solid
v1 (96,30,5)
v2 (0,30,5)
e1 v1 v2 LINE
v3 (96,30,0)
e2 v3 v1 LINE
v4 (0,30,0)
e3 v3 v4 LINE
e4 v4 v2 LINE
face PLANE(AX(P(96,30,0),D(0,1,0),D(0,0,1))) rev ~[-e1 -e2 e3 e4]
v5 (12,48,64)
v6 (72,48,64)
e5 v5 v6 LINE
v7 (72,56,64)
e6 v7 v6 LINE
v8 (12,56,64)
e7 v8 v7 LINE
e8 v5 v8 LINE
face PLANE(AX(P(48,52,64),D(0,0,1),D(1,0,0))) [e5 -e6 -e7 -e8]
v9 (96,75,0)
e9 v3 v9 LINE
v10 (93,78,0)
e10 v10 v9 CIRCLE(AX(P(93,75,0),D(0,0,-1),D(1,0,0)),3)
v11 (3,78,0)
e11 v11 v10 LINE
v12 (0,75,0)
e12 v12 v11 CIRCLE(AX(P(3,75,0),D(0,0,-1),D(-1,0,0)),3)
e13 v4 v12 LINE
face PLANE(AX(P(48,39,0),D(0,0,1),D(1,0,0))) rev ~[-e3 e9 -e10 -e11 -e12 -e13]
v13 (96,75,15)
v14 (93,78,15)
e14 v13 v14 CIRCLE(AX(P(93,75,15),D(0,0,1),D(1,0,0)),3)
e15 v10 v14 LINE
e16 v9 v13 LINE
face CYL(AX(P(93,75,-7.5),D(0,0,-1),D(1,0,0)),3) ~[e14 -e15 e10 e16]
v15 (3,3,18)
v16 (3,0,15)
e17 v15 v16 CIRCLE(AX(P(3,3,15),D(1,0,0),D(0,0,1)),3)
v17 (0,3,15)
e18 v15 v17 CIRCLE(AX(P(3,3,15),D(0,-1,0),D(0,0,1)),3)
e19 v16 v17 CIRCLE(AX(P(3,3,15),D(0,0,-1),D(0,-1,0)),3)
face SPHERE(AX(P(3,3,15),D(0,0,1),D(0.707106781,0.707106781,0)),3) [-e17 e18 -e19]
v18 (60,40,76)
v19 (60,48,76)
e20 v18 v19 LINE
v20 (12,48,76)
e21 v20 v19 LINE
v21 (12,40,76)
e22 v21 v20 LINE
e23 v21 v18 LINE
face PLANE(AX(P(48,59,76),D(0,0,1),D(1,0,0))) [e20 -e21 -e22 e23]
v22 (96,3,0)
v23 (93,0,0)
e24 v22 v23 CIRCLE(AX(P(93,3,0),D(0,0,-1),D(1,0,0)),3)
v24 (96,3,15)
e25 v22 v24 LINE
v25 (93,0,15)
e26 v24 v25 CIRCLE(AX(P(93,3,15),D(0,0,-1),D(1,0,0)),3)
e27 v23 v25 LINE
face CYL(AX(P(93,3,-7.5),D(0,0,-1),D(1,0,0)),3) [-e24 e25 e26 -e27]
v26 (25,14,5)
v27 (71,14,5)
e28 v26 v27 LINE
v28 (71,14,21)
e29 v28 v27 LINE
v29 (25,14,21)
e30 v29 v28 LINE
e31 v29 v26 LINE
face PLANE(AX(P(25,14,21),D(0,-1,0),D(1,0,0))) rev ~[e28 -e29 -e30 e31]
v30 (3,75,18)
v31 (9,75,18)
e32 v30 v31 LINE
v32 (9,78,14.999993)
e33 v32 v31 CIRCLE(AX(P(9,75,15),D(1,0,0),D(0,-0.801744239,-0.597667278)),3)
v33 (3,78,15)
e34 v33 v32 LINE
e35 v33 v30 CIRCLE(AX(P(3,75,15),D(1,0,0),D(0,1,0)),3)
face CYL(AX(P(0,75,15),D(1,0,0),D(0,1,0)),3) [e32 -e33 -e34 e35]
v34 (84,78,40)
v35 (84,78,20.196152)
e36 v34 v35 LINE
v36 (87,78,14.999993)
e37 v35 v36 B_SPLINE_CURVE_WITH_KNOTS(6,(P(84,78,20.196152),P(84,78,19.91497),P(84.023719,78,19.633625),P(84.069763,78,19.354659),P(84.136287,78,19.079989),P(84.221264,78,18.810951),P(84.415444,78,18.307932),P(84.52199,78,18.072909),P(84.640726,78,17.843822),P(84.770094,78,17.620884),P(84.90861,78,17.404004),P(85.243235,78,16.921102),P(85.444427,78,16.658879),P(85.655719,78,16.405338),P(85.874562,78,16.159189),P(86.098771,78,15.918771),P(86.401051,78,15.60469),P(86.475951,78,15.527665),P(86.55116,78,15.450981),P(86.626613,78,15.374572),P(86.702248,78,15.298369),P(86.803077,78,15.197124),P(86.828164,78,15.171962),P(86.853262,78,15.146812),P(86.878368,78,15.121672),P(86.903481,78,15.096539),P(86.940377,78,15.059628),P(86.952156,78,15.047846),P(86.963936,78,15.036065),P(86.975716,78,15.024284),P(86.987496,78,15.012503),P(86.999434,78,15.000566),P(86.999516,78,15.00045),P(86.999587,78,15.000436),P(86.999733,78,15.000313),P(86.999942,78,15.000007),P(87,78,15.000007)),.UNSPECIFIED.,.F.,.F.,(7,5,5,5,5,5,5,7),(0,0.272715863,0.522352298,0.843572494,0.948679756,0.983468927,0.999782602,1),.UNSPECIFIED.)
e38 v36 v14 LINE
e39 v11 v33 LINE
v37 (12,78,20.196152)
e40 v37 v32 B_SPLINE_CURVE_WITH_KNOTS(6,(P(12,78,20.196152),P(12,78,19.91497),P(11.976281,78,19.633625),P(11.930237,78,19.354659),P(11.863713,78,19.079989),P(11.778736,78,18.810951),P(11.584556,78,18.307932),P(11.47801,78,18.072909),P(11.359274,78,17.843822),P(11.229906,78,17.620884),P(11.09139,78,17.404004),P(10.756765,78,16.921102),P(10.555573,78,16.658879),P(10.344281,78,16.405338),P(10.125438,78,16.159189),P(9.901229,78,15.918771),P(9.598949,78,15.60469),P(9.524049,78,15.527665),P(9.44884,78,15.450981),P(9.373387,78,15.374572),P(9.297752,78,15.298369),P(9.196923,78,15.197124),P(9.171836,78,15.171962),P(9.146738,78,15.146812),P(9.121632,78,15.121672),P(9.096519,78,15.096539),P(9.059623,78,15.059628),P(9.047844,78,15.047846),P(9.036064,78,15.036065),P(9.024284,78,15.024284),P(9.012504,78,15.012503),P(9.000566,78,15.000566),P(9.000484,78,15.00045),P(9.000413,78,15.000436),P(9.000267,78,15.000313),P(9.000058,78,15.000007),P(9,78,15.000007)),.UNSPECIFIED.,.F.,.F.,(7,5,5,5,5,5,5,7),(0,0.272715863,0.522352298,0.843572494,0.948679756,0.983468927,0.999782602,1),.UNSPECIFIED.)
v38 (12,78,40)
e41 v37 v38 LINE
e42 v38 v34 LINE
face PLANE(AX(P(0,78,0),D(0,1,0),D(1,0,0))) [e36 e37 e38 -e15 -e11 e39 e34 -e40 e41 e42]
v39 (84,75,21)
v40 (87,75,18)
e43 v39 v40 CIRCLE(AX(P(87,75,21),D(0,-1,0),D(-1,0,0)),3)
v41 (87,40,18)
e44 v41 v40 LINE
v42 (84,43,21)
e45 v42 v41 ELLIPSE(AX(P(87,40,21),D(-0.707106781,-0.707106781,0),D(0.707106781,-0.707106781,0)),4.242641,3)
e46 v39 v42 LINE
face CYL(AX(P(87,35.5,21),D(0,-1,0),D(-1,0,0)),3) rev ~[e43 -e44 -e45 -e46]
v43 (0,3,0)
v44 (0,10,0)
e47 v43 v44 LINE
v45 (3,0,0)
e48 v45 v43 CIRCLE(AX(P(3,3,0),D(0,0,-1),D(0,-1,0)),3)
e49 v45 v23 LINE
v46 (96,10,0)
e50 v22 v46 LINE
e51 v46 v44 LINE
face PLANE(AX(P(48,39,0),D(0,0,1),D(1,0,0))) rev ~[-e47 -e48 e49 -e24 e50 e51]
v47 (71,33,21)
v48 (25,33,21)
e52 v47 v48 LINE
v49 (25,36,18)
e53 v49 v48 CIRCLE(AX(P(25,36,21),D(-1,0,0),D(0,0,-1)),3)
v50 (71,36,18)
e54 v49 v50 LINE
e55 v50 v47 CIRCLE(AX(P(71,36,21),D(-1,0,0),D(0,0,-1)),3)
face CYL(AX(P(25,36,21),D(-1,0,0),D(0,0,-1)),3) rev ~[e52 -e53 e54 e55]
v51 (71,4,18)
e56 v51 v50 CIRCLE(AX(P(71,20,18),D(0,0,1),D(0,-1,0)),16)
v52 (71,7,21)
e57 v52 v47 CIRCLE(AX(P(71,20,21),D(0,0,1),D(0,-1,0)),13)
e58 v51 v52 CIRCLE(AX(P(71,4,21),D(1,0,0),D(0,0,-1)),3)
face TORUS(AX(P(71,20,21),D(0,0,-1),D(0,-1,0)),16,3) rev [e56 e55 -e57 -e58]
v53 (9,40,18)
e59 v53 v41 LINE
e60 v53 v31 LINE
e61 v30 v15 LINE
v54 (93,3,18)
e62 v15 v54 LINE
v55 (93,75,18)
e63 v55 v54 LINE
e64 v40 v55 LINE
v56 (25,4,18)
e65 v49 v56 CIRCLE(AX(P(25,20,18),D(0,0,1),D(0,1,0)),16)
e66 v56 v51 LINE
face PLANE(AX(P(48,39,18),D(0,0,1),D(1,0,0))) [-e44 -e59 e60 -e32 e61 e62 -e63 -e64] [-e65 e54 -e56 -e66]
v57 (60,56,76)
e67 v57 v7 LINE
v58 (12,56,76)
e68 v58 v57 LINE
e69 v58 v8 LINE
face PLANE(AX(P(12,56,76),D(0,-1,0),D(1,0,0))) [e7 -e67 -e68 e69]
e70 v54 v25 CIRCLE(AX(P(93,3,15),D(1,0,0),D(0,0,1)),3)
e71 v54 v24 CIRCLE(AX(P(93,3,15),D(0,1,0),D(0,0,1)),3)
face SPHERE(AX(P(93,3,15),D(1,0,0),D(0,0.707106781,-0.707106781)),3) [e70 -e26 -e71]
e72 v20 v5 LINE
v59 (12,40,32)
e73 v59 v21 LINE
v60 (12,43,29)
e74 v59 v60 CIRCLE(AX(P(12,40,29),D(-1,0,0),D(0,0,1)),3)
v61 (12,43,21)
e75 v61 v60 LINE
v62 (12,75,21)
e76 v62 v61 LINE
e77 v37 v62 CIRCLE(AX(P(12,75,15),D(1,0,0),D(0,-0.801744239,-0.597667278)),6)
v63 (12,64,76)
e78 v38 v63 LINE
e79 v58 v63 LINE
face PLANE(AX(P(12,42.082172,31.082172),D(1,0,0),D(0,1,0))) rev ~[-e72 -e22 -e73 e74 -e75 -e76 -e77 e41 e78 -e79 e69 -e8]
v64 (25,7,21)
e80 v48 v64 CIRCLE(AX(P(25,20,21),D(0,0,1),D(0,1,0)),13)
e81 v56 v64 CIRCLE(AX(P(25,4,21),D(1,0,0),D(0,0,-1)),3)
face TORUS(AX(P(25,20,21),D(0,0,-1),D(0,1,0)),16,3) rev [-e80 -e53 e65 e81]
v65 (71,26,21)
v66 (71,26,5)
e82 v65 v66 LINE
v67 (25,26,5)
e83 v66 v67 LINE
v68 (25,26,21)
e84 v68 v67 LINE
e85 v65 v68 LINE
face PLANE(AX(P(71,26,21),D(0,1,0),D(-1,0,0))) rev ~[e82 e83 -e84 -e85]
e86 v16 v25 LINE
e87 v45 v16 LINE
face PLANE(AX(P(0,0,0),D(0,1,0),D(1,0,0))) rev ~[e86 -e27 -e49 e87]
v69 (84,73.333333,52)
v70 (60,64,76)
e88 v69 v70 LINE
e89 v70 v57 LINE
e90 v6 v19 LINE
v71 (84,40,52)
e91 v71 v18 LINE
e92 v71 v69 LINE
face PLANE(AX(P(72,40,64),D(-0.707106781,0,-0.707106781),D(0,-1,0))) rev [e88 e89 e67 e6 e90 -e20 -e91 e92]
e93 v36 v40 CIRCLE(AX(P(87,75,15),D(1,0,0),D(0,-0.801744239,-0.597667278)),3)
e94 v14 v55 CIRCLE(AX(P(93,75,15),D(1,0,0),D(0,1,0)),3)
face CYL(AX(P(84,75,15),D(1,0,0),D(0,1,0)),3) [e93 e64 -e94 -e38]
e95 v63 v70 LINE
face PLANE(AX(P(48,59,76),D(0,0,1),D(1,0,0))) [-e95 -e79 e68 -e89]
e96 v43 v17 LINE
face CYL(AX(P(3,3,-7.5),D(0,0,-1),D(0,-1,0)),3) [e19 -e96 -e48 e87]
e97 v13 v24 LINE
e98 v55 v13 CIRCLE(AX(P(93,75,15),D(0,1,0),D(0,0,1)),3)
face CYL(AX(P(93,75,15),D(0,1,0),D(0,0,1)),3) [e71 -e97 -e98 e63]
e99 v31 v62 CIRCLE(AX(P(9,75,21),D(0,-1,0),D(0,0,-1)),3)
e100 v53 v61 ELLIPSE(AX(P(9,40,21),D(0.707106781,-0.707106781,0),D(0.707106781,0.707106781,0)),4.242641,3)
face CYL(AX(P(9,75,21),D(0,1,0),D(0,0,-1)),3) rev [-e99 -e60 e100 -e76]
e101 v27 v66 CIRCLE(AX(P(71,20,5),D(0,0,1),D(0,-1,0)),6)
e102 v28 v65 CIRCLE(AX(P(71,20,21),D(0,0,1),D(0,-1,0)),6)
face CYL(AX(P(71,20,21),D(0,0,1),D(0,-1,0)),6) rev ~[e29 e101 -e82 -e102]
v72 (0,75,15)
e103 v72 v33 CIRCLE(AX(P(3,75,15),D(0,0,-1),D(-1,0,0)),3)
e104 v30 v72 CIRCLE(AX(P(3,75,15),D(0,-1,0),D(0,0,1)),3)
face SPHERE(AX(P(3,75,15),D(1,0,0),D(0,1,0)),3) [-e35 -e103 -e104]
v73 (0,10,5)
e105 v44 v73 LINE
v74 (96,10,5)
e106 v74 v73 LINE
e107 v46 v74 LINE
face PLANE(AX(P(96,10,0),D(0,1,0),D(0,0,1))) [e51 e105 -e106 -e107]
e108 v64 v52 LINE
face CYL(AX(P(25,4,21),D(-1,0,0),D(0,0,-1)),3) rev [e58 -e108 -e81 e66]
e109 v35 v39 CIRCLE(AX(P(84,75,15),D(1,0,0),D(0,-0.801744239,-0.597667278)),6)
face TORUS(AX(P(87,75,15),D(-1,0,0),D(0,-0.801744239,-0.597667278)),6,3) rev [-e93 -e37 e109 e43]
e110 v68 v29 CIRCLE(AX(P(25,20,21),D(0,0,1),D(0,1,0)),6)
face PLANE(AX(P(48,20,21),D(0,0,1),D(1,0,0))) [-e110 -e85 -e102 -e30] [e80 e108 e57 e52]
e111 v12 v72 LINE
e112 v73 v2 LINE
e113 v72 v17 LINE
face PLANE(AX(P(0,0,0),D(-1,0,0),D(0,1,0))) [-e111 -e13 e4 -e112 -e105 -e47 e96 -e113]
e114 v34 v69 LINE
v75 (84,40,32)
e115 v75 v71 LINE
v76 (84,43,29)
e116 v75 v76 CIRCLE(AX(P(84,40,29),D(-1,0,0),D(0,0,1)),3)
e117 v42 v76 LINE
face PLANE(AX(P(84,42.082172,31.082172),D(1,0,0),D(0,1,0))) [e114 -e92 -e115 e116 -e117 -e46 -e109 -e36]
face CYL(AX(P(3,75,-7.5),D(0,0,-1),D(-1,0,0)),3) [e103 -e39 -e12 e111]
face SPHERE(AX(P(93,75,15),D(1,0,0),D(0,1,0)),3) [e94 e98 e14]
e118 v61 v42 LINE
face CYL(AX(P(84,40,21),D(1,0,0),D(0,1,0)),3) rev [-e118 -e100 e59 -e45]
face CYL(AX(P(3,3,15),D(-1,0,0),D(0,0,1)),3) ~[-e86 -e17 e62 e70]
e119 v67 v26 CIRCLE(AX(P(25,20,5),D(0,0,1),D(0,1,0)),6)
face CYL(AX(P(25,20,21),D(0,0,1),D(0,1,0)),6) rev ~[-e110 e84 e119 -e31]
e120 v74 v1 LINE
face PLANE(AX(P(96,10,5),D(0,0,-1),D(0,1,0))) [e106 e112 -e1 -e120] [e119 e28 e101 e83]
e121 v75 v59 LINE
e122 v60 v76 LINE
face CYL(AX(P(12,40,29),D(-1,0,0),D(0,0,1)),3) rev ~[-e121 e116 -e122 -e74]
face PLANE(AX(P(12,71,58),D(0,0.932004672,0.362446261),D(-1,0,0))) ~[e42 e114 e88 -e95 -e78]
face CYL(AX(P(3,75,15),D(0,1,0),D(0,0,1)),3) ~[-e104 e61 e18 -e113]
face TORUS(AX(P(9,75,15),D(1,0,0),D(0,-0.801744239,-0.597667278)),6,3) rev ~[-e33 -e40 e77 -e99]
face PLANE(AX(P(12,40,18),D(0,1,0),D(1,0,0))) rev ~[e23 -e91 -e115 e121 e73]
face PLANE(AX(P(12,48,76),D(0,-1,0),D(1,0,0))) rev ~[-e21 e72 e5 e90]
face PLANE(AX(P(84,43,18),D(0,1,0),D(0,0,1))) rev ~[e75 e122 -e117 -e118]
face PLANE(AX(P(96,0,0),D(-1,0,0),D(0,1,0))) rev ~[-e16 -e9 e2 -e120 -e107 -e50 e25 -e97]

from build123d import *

# Parameters (mm, degrees)
F0_W          = 96
F0_H          = 78
F1_DEPTH      = 18
F2_W          = 72
F2_H          = 38
F3_DEPTH      = 58
F4_R          = 3
F5_W          = 72
F5_H          = 8
F6_DEPTH      = 12
F7_C1_SIZE    = 24
F8_SIZE2      = 14
F8_SIZE       = 36
F9_W          = 3
F9_H          = 14
F10_DEPTH     = 72
F11_W         = 20
F11_H         = 5
F12_DEPTH     = 96
F14_DEPTH     = 3
F16_DEPTH     = 16
F17_T1_DEPTH  = 72
F17_T3_DEPTH  = 32
F17_T5_DEPTH  = 46
F17_T8_ANGLE  = 180
F17_T10_ANGLE = 180
F17_T14_ANGLE = 233.2969892374
F17_T19_ANGLE = 233.2969892374
F17_T25_DEPTH = 39.5
F17_T29_DEPTH = 79.5
F17_T36_DEPTH = 79.5
F17_T40_DEPTH = 39.5
F17_T43_DEPTH = 22.5
F17_T45_DEPTH = 90
F17_T47_DEPTH = 72
F17_S51_W     = 3.06
F17_S51_H     = 3.06
F17_T52_DEPTH = 3.06
F17_S57_W     = 3.06
F17_S57_H     = 3.06
F17_T58_DEPTH = 3.06
F17_T62_ANGLE = 90
F17_T64_ANGLE = 90


# Not quite as in the source:
# - a fillet or chamfer that OpenCascade refuses, or shapes differently, is made with other operations: its cross-section is extruded or revolved along the edge and cut away or added


with BuildPart() as f1:
    # F0 (on Top) → F1 (new body)
    with BuildSketch(Plane.XY):
        with Locations((48, 39)):
            Rectangle(F0_W, F0_H)
    extrude(amount=F1_DEPTH)

    # F2 (on face) → F3 (join)
    with BuildSketch(Plane.XY.offset(18)):
        with Locations((48, 59)):
            Rectangle(F2_W, F2_H)
    extrude(amount=F3_DEPTH)

    # F4
    f4_edges = [f1.edges().sort_by_distance(p)[0] for p in [
        (90, 78, 18),
        (6, 78, 18),
    ]]
    fillet(f4_edges, radius=F4_R)

    # F5 (on face) → F6 (cut)
    with BuildSketch(Plane.XY.offset(76)):
        with Locations((48, 52)):
            Rectangle(F5_W, F5_H)
    extrude(amount=-F6_DEPTH, mode=Mode.SUBTRACT)

    # F7: chamfer of 24 on 2 edges, made by hand

    # F7_c1
    f7_c1_edges = [f1.edges().sort_by_distance(p)[0] for p in [
        (84, 44, 76),
    ]]
    chamfer(f7_c1_edges, length=F7_C1_SIZE)

    # F8
    f8_edges = [f1.edges().sort_by_distance(p)[0] for p in [
        (36, 78, 76),
    ]]
    f8_side = f1.faces().sort_by_distance((46.545455, 78, 34.461039))[0]
    chamfer(f8_edges, length=F8_SIZE, length2=F8_SIZE2, reference=f8_side)

    # F9 (on face) → F10 (cut, through all)
    with BuildSketch(Plane.YZ.offset(84)):
        with Locations((41.5, 25)):
            Rectangle(F9_W, F9_H)
    extrude(amount=-F10_DEPTH, mode=Mode.SUBTRACT)

    # F11 (on face) → F12 (cut, through all)
    with BuildSketch(Plane.YZ.offset(96)):
        with Locations((20, 2.5)):
            Rectangle(F11_W, F11_H)
    extrude(amount=-F12_DEPTH, mode=Mode.SUBTRACT)

    # F13 (on face) → F14 (join)
    with BuildSketch(Plane.XY.offset(18)):
        with BuildLine():
            ThreePointArc((71, 7), (84, 20), (71, 33))
            Line((71, 33), (25, 33))
            ThreePointArc((25, 33), (12, 20), (25, 7))
            Line((25, 7), (71, 7))
        make_face()
    extrude(amount=F14_DEPTH)

    # F15 (on face) → F16 (cut, through all)
    with BuildSketch(Plane.XY.offset(21)):
        with BuildLine():
            ThreePointArc((25, 26), (19, 20), (25, 14))
            Line((25, 14), (71, 14))
            ThreePointArc((71, 14), (77, 20), (71, 26))
            Line((71, 26), (25, 26))
        make_face()
    extrude(amount=-F16_DEPTH, mode=Mode.SUBTRACT)

    # F17: fillet of radius 3 on 17 edges, made by hand

    # F17_s2 → F17_t1 (join)
    with BuildSketch(Plane.YZ.offset(12)):
        with BuildLine():
            ThreePointArc((40, 32), (42.1213203436, 31.1213203436), (43, 29))
            Line((43, 29), (43, 32))
            Line((43, 32), (40, 32))
        make_face()
        with BuildLine():
            ThreePointArc((43, 21), (42.1213203436, 18.8786796564), (40, 18))
            Line((40, 18), (43, 18))
            Line((43, 18), (43, 21))
        make_face()
    extrude(amount=F17_T1_DEPTH)

    # F17_s4 → F17_t3 (join)
    with BuildSketch(Plane.XZ.offset(-75)):
        with BuildLine():
            ThreePointArc((84, 21), (84.8786796564, 18.8786796564), (87, 18))
            Line((87, 18), (84, 18))
            Line((84, 18), (84, 21))
        make_face()
        with BuildLine():
            ThreePointArc((9, 18), (11.1213203436, 18.8786796564), (12, 21))
            Line((12, 21), (12, 18))
            Line((12, 18), (9, 18))
        make_face()
    extrude(amount=F17_T3_DEPTH)

    # F17_s6 → F17_t5 (join)
    with BuildSketch(Plane.YZ.offset(25)):
        with BuildLine():
            ThreePointArc((4, 18), (6.1213203436, 18.8786796564), (7, 21))
            Line((7, 21), (7, 18))
            Line((7, 18), (4, 18))
        make_face()
        with BuildLine():
            ThreePointArc((36, 18), (33.8786796564, 18.8786796564), (33, 21))
            Line((33, 21), (33, 18))
            Line((33, 18), (36, 18))
        make_face()
    extrude(amount=F17_T5_DEPTH)

    # F17_s7 → F17_t8 (revolve)
    with BuildSketch(Plane.YZ.offset(25)):
        with BuildLine():
            ThreePointArc((36, 18), (33.8786796564, 18.8786796564), (33, 21))
            Line((33, 21), (33, 18))
            Line((33, 18), (36, 18))
        make_face()
    revolve(axis=Axis((25, 20, 18), (0, 0, 1)), revolution_arc=F17_T8_ANGLE)

    # F17_s9 → F17_t10 (revolve)
    with BuildSketch(Plane.YZ.offset(71)):
        with BuildLine():
            ThreePointArc((4, 18), (6.1213203436, 18.8786796564), (7, 21))
            Line((7, 21), (7, 18))
            Line((7, 18), (4, 18))
        make_face()
    revolve(axis=Axis((71, 20, 18), (0, 0, 1)), revolution_arc=F17_T10_ANGLE)


with BuildPart() as f17_tool12:
    # F17_s13 → F17_t14 (revolve)
    with BuildSketch(Plane(origin=(0, 19.6028186536, -26.2963148857), x_dir=(1, 0, 0), z_dir=(0, -0.5976672776, 0.8017442393))):
        with BuildLine():
            ThreePointArc((12, 63.0958271118), (11.1213203436, 65.2171474554), (9, 66.0958271118))
            Line((9, 66.0958271118), (12, 66.0958271118))
            Line((12, 66.0958271118), (12, 63.0958271118))
        make_face()
    revolve(axis=Axis((12, 75, 15), (1, 0, 0)), revolution_arc=F17_T14_ANGLE)

    split(bisect_by=Plane.XZ.offset(-78), keep=Keep.TOP)


with BuildPart() as f1_1:
    add(f1.part)

    # F17_t11: union F17_tool12
    add(f17_tool12.part)


with BuildPart() as f17_tool17:
    # F17_s18 → F17_t19 (revolve)
    with BuildSketch(Plane(origin=(0, 19.6028186536, -26.2963148857), x_dir=(1, 0, 0), z_dir=(0, -0.5976672776, 0.8017442393))):
        with BuildLine():
            ThreePointArc((84, 63.0958271118), (84.8786796564, 65.2171474554), (87, 66.0958271118))
            Line((87, 66.0958271118), (84, 66.0958271118))
            Line((84, 66.0958271118), (84, 63.0958271118))
        make_face()
    revolve(axis=Axis((84, 75, 15), (1, 0, 0)), revolution_arc=F17_T19_ANGLE)

    split(bisect_by=Plane.XZ.offset(-78), keep=Keep.TOP)


with BuildPart() as f1_2:
    add(f1_1.part)

    # F17_t16: union F17_tool17
    add(f17_tool17.part)


with BuildPart() as f17_tool23:
    # F17_s24 → F17_t25 (new body)
    with BuildSketch(Plane.XZ.offset(-35.5)):
        with BuildLine():
            ThreePointArc((84, 21), (84.8786796564, 18.8786796564), (87, 18))
            Line((87, 18), (84, 18))
            Line((84, 18), (84, 21))
        make_face()
    extrude(amount=-F17_T25_DEPTH)

    split(bisect_by=Plane.XZ.offset(-43), keep=Keep.TOP)


with BuildPart() as f17_tool27:
    # F17_s28 → F17_t29 (new body)
    with BuildSketch(Plane.YZ.offset(91.5)):
        with BuildLine():
            ThreePointArc((43, 21), (42.1213203436, 18.8786796564), (40, 18))
            Line((40, 18), (43, 18))
            Line((43, 18), (43, 21))
        make_face()
    extrude(amount=-F17_T29_DEPTH)

    split(bisect_by=Plane.YZ.offset(84), keep=Keep.TOP)


with BuildPart() as f17_tool23_1:
    add(f17_tool23.part)

    # F17_t31: intersect F17_tool27
    add(f17_tool27.part, mode=Mode.INTERSECT)


with BuildPart() as f1_3:
    add(f1_2.part)

    # F17_t21: union F17_tool23
    add(f17_tool23_1.part)


with BuildPart() as f17_tool34:
    # F17_s35 → F17_t36 (new body)
    with BuildSketch(Plane.YZ.offset(84)):
        with BuildLine():
            ThreePointArc((43, 21), (42.1213203436, 18.8786796564), (40, 18))
            Line((40, 18), (43, 18))
            Line((43, 18), (43, 21))
        make_face()
    extrude(amount=-F17_T36_DEPTH)

    split(bisect_by=Plane.YZ.offset(12), keep=Keep.BOTTOM)


with BuildPart() as f17_tool38:
    # F17_s39 → F17_t40 (new body)
    with BuildSketch(Plane.XZ.offset(-75)):
        with BuildLine():
            ThreePointArc((9, 18), (11.1213203436, 18.8786796564), (12, 21))
            Line((12, 21), (12, 18))
            Line((12, 18), (9, 18))
        make_face()
    extrude(amount=F17_T40_DEPTH)

    split(bisect_by=Plane.XZ.offset(-43), keep=Keep.TOP)


with BuildPart() as f17_tool34_1:
    add(f17_tool34.part)

    # F17_t42: intersect F17_tool38
    add(f17_tool38.part, mode=Mode.INTERSECT)


with BuildPart() as f1_4:
    add(f1_3.part)

    # F17_t32: union F17_tool34
    add(f17_tool34_1.part)

    # F17_s44 → F17_t43 (cut)
    with BuildSketch(Plane.XY.offset(-7.5)):
        with BuildLine():
            ThreePointArc((3, 0), (0.8786796564, 0.8786796564), (0, 3))
            Line((0, 3), (0, 0))
            Line((0, 0), (3, 0))
        make_face()
        with BuildLine():
            ThreePointArc((96, 3), (95.1213203436, 0.8786796564), (93, 0))
            Line((93, 0), (96, 0))
            Line((96, 0), (96, 3))
        make_face()
        with BuildLine():
            ThreePointArc((0, 75), (0.8786796564, 77.1213203436), (3, 78))
            Line((3, 78), (0, 78))
            Line((0, 78), (0, 75))
        make_face()
        with BuildLine():
            ThreePointArc((96, 75), (95.1213203436, 77.1213203436), (93, 78))
            Line((93, 78), (96, 78))
            Line((96, 78), (96, 75))
        make_face()
    extrude(amount=F17_T43_DEPTH, mode=Mode.SUBTRACT)

    # F17_s46 → F17_t45 (cut)
    with BuildSketch(Plane.YZ.offset(3)):
        with BuildLine():
            ThreePointArc((3, 18), (0.8786796564, 17.1213203436), (0, 15))
            Line((0, 15), (0, 18))
            Line((0, 18), (3, 18))
        make_face()
    extrude(amount=F17_T45_DEPTH, mode=Mode.SUBTRACT)

    # F17_s48 → F17_t47 (cut)
    with BuildSketch(Plane.XZ.offset(-75)):
        with BuildLine():
            ThreePointArc((3, 18), (0.8786796564, 17.1213203436), (0, 15))
            Line((0, 15), (0, 18))
            Line((0, 18), (3, 18))
        make_face()
        with BuildLine():
            ThreePointArc((93, 18), (95.1213203436, 17.1213203436), (96, 15))
            Line((96, 15), (96, 18))
            Line((96, 18), (93, 18))
        make_face()
    extrude(amount=F17_T47_DEPTH, mode=Mode.SUBTRACT)


with BuildPart() as f17_tool50:
    # F17_s51 → F17_t52 (new body)
    with BuildSketch(Plane.XY.offset(15)):
        with Locations((1.47, 1.47)):
            Rectangle(F17_S51_W, F17_S51_H)
    extrude(amount=F17_T52_DEPTH)

    # F17_s53 → F17_t54 (revolve, cut)
    with BuildSketch(Plane(origin=(3, 3, 15), x_dir=(0.7071067812, 0.7071067812, 0), z_dir=(0.7071067812, -0.7071067812, 0))):
        with BuildLine():
            ThreePointArc((0, -3), (3, 0), (0, 3))
            Line((0, 3), (0, -3))
        make_face()
    revolve(axis=Axis((3, 3, 15), (0, 0, 1)), mode=Mode.SUBTRACT)


with BuildPart() as f1_5:
    add(f1_4.part)

    # F17_t49: cut F17_tool50
    add(f17_tool50.part, mode=Mode.SUBTRACT)


with BuildPart() as f17_tool56:
    # F17_s57 → F17_t58 (new body)
    with BuildSketch(Plane.YZ.offset(93)):
        with Locations((1.47, 16.53)):
            Rectangle(F17_S57_W, F17_S57_H)
    extrude(amount=F17_T58_DEPTH)

    # F17_s59 → F17_t60 (revolve, cut)
    with BuildSketch(Plane(origin=(93, 3, 15), x_dir=(0, 0.7071067812, -0.7071067812), z_dir=(0, -0.7071067812, -0.7071067812))):
        with BuildLine():
            ThreePointArc((0, -3), (3, 0), (0, 3))
            Line((0, 3), (0, -3))
        make_face()
    revolve(axis=Axis((93, 3, 15), (1, 0, 0)), mode=Mode.SUBTRACT)


with BuildPart() as f1_6:
    add(f1_5.part)

    # F17_t55: cut F17_tool56
    add(f17_tool56.part, mode=Mode.SUBTRACT)

    # F17_s61 → F17_t62 (revolve, cut)
    with BuildSketch(Plane.XY.offset(15)):
        with BuildLine():
            ThreePointArc((93, 78), (95.1213203436, 77.1213203436), (96, 75))
            Line((96, 75), (96, 78))
            Line((96, 78), (93, 78))
        make_face()
    revolve(axis=Axis((96, 75, 15), (1, 0, 0)), revolution_arc=F17_T62_ANGLE, mode=Mode.SUBTRACT)

    # F17_s63 → F17_t64 (revolve, cut)
    with BuildSketch(Plane.XY.offset(15)):
        with BuildLine():
            ThreePointArc((0, 75), (0.8786796564, 77.1213203436), (3, 78))
            Line((3, 78), (0, 78))
            Line((0, 78), (0, 75))
        make_face()
    revolve(axis=Axis((0, 75, 15), (1, 0, 0)), revolution_arc=F17_T64_ANGLE, mode=Mode.SUBTRACT)


solid = f1_6.part
